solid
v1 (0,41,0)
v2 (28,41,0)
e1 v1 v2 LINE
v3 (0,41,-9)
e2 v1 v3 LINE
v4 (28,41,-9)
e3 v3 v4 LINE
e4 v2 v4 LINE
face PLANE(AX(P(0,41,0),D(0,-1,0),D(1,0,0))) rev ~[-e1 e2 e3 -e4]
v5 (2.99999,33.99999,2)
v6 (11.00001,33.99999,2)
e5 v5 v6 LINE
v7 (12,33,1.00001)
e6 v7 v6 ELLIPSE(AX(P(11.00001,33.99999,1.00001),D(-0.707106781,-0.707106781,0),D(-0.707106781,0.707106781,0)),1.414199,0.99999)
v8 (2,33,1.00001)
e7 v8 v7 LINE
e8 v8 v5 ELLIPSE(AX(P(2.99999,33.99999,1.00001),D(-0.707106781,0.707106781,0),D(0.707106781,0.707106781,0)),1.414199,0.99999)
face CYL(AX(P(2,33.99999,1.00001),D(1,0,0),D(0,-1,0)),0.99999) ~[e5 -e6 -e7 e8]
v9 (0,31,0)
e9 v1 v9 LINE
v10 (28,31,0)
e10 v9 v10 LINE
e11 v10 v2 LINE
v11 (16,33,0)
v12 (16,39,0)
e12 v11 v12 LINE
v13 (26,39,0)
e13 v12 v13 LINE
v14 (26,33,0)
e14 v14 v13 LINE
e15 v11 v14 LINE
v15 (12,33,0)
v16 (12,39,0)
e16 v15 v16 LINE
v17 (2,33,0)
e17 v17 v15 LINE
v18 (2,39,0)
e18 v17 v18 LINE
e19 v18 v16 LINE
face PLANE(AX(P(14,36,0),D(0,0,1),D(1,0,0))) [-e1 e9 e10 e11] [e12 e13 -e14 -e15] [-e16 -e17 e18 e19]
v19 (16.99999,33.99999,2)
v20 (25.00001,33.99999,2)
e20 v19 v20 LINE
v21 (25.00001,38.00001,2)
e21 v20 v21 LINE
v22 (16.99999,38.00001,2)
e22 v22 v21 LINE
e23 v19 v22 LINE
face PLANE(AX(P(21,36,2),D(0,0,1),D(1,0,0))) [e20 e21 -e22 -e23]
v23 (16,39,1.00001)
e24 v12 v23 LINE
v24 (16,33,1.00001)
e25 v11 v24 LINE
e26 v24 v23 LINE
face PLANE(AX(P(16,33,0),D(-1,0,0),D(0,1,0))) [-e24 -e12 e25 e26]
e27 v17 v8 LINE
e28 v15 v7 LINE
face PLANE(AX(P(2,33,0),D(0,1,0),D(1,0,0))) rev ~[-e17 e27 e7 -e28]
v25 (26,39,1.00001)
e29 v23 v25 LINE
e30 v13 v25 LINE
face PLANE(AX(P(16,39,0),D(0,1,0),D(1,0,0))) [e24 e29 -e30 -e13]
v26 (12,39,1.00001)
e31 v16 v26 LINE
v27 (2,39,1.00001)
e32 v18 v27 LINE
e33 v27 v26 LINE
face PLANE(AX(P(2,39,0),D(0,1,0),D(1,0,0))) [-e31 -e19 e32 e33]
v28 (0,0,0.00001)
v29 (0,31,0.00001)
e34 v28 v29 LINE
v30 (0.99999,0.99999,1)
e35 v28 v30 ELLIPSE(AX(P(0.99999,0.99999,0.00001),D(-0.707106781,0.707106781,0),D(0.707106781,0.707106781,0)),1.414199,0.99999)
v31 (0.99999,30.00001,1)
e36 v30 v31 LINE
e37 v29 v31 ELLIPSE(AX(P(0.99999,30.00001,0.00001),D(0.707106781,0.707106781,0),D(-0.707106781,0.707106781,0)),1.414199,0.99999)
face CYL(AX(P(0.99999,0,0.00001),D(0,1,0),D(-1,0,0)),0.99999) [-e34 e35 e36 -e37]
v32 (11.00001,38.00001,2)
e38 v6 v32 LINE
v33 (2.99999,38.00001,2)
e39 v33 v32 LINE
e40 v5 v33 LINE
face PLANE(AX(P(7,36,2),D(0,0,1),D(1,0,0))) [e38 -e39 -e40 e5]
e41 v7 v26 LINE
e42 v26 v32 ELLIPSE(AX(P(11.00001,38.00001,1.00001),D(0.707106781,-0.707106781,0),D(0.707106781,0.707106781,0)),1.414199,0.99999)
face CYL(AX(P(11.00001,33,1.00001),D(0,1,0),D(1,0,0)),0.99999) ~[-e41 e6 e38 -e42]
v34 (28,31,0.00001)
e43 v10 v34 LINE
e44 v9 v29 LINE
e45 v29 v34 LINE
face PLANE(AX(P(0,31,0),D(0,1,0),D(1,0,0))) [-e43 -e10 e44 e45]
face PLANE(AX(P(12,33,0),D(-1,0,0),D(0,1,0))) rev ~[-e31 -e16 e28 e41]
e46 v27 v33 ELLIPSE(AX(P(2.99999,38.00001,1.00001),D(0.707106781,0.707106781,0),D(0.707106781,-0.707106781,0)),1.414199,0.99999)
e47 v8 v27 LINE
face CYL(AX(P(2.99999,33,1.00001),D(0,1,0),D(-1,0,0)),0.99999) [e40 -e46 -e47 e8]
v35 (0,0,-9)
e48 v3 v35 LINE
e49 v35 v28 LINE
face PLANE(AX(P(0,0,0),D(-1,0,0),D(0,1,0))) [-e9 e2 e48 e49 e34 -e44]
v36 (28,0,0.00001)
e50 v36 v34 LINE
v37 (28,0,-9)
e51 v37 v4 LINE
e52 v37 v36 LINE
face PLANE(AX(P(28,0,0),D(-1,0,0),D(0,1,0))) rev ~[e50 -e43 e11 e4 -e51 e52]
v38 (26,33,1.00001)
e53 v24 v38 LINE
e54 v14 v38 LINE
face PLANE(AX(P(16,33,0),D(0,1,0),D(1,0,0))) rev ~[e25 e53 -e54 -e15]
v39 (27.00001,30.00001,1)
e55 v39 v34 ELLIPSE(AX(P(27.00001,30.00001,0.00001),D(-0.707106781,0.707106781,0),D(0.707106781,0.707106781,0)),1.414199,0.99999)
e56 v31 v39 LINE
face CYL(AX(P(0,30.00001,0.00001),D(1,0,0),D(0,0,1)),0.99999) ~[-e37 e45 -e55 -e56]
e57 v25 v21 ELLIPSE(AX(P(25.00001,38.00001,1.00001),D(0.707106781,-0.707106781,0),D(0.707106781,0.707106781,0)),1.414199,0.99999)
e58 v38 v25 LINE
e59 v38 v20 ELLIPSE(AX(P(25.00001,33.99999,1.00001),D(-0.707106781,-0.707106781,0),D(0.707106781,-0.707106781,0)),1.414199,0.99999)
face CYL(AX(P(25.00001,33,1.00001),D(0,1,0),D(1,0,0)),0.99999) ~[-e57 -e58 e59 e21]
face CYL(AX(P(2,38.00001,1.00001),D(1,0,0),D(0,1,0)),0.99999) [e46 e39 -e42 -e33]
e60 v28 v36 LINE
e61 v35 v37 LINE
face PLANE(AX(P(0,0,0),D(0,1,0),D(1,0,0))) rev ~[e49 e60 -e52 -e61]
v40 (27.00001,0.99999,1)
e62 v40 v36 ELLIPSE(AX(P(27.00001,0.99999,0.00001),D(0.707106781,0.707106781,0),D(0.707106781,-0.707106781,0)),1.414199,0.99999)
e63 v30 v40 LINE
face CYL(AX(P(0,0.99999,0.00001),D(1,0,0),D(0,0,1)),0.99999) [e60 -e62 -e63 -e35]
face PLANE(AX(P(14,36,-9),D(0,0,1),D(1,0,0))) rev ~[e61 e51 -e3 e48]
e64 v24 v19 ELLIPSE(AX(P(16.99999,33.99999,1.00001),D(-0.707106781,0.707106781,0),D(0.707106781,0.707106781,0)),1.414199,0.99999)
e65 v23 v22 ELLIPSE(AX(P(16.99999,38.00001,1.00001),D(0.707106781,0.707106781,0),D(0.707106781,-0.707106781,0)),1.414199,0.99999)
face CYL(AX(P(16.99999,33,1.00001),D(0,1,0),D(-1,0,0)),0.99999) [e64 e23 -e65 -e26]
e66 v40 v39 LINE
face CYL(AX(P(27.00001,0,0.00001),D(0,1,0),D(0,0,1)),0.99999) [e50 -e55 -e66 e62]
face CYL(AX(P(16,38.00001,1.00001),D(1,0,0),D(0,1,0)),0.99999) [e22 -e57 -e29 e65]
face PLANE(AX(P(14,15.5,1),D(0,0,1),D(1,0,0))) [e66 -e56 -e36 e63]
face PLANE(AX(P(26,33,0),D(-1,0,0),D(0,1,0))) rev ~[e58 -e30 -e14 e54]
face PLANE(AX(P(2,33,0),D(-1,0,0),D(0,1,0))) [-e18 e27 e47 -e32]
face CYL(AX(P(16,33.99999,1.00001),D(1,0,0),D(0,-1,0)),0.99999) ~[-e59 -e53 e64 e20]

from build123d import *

# Parameters (mm, degrees)
F0_W     = 28
F0_H     = 10
F0_W_2   = 10
F0_H_2   = 6
F0_H_3   = 31
F1_DEPTH = 9
F2_DEPTH = 1
F3_DEPTH = 2
F4_R     = 0.99999


# Not quite as in the source:
# - a fillet or chamfer is up to 0.001 mm smaller than in the source, because OpenCascade refuses the exact size


with BuildPart() as f1:
    # F0 (on Top) → F1 (new body)
    with BuildSketch(Plane.XY):
        with Locations((14, 36)):
            Rectangle(F0_W, F0_H)
        with Locations((7, 36)):
            Rectangle(F0_W_2, F0_H_2, mode=Mode.SUBTRACT)
        with Locations((21, 36)):
            Rectangle(F0_W_2, F0_H_2, mode=Mode.SUBTRACT)
        with Locations((7, 36)):
            Rectangle(F0_W_2, F0_H_2)
        with Locations((21, 36)):
            Rectangle(F0_W_2, F0_H_2)
        with Locations((14, 15.5)):
            Rectangle(F0_W, F0_H_3)
    extrude(amount=-F1_DEPTH)

    # F0 (on Top) → F2 (join)
    with BuildSketch(Plane.XY):
        with Locations((14, 15.5)):
            Rectangle(F0_W, F0_H_3)
    extrude(amount=F2_DEPTH)

    # F0 (on Top) → F3 (join)
    with BuildSketch(Plane.XY):
        with Locations((7, 36)):
            Rectangle(F0_W_2, F0_H_2)
        with Locations((21, 36)):
            Rectangle(F0_W_2, F0_H_2)
    extrude(amount=F3_DEPTH)

    # F4 (radius 1 in the source; OpenCascade refuses exactly that, so slightly less here)
    f4_edges = [f1.edges().sort_by_distance(p)[0] for p in [
        (12, 36, 2),
        (7, 39, 2),
        (2, 36, 2),
        (7, 33, 2),
        (21, 39, 2),
        (16, 36, 2),
        (21, 33, 2),
        (26, 36, 2),
        (0, 15.5, 1),
        (14, 0, 1),
        (28, 15.5, 1),
        (14, 31, 1),
    ]]
    fillet(f4_edges, radius=F4_R)


solid = f1.part
